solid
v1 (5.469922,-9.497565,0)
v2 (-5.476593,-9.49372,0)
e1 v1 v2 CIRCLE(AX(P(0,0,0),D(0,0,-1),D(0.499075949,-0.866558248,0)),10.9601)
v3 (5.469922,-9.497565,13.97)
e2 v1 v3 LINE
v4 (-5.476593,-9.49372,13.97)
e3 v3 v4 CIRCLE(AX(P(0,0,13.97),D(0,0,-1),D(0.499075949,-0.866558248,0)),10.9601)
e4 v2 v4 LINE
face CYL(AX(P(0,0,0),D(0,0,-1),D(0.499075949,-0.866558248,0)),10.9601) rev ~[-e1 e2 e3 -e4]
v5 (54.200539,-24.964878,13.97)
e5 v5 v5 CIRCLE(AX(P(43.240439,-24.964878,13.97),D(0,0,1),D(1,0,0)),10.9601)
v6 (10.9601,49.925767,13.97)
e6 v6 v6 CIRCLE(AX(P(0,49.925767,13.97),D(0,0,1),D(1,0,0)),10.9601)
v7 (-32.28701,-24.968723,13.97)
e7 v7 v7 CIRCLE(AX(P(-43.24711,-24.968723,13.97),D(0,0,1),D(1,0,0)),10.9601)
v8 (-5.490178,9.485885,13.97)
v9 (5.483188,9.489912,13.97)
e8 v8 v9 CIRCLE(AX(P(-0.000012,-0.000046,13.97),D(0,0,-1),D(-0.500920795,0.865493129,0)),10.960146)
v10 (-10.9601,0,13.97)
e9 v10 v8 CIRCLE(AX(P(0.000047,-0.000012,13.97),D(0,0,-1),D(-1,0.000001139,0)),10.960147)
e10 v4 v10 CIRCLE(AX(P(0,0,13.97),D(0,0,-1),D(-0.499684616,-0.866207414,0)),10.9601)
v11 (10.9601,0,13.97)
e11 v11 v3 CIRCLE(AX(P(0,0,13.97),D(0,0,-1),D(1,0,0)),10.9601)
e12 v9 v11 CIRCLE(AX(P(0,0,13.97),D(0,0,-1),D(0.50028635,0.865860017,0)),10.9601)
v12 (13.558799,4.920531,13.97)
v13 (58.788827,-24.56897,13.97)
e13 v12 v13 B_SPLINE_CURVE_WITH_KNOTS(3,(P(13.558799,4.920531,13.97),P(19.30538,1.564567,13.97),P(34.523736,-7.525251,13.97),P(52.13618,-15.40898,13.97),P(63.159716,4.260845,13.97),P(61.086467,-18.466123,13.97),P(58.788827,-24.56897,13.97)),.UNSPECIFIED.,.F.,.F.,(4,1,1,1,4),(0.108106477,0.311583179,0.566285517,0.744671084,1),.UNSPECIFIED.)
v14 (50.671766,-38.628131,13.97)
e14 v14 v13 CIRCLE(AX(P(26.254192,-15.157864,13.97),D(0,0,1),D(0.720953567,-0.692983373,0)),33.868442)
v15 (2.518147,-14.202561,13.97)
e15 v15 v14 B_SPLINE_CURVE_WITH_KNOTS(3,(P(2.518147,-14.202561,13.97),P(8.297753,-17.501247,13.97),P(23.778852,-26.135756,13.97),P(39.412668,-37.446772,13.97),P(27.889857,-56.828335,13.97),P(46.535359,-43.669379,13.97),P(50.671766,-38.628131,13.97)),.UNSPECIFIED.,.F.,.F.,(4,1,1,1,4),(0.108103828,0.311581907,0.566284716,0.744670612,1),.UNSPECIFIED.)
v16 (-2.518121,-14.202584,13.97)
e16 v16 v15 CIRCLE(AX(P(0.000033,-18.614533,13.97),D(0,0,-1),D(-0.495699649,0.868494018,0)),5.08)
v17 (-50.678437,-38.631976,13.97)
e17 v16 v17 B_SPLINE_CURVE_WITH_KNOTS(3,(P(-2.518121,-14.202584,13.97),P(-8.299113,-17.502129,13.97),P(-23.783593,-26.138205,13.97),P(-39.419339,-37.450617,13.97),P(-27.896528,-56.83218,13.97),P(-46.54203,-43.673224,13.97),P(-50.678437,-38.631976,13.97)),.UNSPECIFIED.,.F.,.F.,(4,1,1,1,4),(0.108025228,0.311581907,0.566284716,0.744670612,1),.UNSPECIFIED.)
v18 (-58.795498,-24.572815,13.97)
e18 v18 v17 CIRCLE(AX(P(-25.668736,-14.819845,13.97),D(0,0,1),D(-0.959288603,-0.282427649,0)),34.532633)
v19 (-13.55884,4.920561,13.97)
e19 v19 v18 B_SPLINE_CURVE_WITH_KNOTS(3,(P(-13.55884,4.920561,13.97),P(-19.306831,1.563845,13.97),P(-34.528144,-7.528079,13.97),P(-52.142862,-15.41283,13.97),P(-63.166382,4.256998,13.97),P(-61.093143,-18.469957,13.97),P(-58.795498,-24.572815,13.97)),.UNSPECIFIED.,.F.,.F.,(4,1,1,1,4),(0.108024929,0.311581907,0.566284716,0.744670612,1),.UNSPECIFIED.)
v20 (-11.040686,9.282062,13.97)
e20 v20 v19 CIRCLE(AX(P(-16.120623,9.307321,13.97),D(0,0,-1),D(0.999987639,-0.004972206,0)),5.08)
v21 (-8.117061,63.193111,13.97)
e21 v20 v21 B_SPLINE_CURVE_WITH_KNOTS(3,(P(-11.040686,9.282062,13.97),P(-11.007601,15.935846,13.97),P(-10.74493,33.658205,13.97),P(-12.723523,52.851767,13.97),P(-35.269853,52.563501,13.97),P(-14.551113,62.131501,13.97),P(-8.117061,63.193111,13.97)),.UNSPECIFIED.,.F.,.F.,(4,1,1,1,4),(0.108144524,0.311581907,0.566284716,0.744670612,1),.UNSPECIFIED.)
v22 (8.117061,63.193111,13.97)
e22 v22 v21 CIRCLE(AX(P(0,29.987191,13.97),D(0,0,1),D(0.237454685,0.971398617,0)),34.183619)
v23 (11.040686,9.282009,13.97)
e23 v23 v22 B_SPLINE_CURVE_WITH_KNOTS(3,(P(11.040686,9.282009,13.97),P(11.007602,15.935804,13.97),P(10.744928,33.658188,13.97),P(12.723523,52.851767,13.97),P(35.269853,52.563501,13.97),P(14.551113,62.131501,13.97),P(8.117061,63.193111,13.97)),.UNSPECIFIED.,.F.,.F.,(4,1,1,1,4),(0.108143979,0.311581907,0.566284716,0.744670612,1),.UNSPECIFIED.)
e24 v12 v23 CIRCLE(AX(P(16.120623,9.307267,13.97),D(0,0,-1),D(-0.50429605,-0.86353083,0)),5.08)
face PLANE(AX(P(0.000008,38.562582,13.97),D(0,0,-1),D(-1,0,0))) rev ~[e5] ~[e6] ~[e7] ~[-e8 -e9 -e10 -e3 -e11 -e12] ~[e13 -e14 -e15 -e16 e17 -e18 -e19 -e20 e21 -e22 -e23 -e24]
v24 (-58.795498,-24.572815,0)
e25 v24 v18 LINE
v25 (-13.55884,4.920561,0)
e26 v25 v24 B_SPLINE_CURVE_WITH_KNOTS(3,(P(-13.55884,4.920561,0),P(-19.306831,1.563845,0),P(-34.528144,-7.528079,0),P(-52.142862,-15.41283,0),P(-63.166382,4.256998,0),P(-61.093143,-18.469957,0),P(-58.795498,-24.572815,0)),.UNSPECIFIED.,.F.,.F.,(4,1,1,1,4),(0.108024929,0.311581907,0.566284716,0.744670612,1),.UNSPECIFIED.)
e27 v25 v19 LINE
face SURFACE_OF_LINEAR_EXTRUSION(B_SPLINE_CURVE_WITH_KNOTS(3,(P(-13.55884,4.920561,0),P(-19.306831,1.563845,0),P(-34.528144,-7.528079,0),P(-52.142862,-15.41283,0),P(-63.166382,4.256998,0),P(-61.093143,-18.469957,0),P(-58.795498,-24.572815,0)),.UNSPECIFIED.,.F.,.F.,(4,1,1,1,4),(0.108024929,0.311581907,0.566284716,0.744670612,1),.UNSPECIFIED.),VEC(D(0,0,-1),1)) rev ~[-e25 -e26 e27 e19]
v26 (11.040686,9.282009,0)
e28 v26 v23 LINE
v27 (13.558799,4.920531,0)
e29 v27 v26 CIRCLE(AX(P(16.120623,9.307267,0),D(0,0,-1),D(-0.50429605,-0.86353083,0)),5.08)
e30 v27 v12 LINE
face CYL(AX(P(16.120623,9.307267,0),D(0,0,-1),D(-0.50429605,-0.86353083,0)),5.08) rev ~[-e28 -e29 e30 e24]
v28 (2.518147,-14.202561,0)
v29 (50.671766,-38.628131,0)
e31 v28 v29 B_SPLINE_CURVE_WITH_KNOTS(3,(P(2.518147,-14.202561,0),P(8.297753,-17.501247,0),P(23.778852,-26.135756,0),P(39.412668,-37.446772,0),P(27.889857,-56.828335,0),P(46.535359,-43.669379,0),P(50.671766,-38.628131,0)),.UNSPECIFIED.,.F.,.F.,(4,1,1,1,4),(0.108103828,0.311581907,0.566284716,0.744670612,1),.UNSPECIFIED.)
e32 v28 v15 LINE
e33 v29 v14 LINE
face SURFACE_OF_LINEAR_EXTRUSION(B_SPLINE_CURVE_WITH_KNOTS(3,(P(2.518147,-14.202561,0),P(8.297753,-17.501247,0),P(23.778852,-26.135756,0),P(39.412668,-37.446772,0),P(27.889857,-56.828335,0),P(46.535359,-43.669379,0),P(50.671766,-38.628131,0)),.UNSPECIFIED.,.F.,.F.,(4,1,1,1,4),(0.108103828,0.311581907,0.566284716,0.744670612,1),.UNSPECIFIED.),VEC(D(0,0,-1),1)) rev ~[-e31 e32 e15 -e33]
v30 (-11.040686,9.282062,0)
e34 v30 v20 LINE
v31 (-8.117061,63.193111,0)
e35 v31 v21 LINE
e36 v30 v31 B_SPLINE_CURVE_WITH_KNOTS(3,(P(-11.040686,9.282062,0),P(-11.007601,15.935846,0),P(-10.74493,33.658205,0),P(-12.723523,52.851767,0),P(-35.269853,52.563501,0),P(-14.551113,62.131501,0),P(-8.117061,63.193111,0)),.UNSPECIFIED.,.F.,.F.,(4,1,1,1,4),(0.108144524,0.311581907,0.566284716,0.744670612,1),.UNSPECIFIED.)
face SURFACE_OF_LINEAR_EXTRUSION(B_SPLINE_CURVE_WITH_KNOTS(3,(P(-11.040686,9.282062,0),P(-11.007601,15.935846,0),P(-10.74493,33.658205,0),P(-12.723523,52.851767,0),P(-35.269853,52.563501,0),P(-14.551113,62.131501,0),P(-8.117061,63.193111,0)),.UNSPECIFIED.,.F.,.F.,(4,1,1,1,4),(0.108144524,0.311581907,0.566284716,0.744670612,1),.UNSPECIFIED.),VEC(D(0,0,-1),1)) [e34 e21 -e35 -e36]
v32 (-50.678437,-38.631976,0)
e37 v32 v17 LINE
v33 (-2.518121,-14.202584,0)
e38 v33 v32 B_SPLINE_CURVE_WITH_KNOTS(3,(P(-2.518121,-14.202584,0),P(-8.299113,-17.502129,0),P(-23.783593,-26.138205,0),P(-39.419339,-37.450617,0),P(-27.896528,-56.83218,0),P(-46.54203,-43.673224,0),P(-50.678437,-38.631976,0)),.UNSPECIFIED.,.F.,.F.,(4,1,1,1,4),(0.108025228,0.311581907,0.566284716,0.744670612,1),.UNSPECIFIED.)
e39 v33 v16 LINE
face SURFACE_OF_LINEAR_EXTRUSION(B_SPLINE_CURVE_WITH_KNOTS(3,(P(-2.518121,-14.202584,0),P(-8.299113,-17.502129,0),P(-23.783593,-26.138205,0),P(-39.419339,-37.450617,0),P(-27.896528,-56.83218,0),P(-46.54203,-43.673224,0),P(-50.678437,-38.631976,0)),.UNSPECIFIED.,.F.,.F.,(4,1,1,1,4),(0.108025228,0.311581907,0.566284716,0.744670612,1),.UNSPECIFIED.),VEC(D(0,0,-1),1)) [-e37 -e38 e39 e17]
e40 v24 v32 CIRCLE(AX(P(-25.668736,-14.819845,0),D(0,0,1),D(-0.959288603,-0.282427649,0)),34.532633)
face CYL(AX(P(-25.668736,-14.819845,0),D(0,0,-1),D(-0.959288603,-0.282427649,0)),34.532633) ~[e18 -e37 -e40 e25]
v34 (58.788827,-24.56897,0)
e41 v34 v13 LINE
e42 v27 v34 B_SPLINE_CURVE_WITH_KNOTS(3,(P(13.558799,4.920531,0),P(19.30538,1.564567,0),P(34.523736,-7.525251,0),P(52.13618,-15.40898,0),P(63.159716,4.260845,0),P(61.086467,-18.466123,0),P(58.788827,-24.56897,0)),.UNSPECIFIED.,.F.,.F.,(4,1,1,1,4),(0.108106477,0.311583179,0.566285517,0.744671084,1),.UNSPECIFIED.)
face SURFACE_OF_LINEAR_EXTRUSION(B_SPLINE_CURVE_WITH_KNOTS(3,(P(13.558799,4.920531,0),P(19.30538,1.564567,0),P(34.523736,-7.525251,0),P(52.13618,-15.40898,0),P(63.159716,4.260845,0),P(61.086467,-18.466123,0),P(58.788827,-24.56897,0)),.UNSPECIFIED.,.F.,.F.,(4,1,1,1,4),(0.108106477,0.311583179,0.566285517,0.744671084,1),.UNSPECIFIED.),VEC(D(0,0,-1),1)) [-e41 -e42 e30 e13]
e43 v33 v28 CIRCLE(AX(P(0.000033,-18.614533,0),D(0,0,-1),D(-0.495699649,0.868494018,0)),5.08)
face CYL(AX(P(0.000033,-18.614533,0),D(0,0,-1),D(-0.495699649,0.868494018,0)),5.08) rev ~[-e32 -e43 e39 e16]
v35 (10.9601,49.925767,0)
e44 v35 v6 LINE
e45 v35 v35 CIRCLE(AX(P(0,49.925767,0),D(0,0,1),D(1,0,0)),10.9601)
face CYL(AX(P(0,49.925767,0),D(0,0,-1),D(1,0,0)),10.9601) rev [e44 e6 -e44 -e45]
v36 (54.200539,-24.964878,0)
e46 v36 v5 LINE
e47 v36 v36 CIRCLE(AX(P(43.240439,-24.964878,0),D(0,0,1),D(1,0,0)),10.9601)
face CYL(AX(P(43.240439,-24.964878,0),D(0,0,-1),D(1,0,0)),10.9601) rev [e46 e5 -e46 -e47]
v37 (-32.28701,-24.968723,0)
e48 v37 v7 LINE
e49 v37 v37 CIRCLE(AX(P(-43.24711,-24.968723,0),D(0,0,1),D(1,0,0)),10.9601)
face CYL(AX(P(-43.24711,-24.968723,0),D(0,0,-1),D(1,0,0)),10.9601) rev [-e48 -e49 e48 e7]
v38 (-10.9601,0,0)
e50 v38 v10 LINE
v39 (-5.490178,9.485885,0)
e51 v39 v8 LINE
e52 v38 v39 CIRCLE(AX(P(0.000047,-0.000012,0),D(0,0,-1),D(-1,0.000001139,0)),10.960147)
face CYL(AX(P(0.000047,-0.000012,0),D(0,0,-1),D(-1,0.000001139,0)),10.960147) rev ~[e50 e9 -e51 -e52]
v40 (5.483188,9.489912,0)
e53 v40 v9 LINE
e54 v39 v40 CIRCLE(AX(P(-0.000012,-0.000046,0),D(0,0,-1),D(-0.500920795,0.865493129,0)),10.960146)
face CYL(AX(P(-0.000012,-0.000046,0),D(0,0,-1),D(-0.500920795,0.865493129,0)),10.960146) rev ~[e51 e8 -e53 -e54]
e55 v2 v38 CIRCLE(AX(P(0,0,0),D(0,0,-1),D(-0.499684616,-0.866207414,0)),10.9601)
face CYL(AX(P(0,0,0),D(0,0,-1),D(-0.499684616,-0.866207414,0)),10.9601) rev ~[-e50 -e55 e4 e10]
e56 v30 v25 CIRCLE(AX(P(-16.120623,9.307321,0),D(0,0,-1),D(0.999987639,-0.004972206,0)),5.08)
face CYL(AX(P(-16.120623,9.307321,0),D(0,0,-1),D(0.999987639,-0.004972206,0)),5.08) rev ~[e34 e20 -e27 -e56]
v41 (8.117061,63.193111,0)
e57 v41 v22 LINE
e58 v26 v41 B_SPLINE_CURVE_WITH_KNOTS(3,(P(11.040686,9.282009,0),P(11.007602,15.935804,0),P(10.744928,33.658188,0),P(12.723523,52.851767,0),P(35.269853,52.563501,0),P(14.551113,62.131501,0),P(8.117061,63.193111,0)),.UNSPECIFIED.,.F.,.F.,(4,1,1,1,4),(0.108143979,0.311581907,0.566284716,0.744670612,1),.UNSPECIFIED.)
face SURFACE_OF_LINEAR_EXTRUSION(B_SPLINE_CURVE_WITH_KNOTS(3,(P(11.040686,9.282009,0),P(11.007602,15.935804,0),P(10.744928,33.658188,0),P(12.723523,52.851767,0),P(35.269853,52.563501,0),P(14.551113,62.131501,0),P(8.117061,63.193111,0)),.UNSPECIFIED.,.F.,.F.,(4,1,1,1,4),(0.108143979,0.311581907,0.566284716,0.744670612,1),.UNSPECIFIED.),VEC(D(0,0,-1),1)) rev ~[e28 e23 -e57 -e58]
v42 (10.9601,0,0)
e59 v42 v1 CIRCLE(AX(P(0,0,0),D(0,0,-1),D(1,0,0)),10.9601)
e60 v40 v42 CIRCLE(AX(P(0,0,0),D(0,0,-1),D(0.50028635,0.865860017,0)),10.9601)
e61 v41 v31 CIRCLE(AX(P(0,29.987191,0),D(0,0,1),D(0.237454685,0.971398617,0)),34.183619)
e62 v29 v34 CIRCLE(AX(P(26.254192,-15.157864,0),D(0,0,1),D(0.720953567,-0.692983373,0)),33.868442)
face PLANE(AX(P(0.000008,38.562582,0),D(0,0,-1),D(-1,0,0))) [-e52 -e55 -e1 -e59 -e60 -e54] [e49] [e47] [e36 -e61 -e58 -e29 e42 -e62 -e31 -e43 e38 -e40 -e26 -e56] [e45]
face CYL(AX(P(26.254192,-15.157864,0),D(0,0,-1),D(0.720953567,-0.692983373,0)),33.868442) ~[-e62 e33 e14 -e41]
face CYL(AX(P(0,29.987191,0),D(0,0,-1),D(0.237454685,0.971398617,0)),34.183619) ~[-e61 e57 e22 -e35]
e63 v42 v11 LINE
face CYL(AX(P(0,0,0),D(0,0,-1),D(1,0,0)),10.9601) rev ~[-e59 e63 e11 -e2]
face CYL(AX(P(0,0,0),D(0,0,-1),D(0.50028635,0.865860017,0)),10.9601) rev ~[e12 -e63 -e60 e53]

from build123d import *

# Parameters (mm, degrees)
F0_R     = 10.9601
F1_DEPTH = 13.97


# Not quite as in the source:
# - ends of sketch curves that miss each other by under 0.0002 mm in the source are joined


with BuildPart() as f1:
    # F0 (on Top) → F1 (new body)
    with BuildSketch(Plane.XY):
        with BuildLine():
            add(Edge.make_bspline(
                [(-11.0406858774, 9.2820621436), (-11.0076014857, 15.9358459435), (-10.7449299367, 33.6582046386), (-12.7235225678, 52.8517669252), (-35.2698533951, 52.5635012401), (-14.5511130353, 62.1315011674), (-8.1170605379, 63.1931111653)],
                knots=[0.1081445238, 0.1081445238, 0.1081445238, 0.1081445238, 0.3115819068, 0.5662847157, 0.7446706117, 1, 1, 1, 1], degree=3))
            add(Edge.make_bspline(
                [(-11.0485298495, 6.3788758502), (-11.0487262833, 7.3148332558), (-11.0456445743, 8.2847913468), (-11.0406858774, 9.2820621436)],
                knots=[0.0776532775, 0.0776532775, 0.0776532775, 0.0776532775, 0.1081445238, 0.1081445238, 0.1081445238, 0.1081445238], degree=3))
            add(Edge.make_bspline(
                [(-5.490177696, 9.4858849998), (-7.1072740945, 8.6285327965), (-8.9879537059, 7.5678930589), (-11.0485298495, 6.3788758502)],
                knots=[0, 0, 0, 0, 0.077526237, 0.077526237, 0.077526237, 0.077526237], degree=3))
            ThreePointArc((-5.490177696, 9.4858849998), (-0.0040332803, 10.9600992579), (5.4831884226, 9.4899123669))
            add(Edge.make_bspline(
                [(5.4831884226, 9.4899123669), (7.1021143759, 8.6315901702), (8.9852286388, 7.5695155183), (11.0485570412, 6.378854666)],
                knots=[0, 0, 0, 0, 0.0776139489, 0.0776139489, 0.0776139489, 0.0776139489], degree=3))
            add(Edge.make_bspline(
                [(11.0485570412, 6.378854666), (11.0487264298, 7.3147693284), (11.0456448051, 8.2847324252), (11.0406861431, 9.2820087008)],
                knots=[0.0776525355, 0.0776525355, 0.0776525355, 0.0776525355, 0.1081439792, 0.1081439792, 0.1081439792, 0.1081439792], degree=3))
            add(Edge.make_bspline(
                [(11.0406861431, 9.2820087008), (11.0076021103, 15.9358038046), (10.7449282436, 33.658188215), (12.7235225678, 52.8517669252), (35.2698533951, 52.5635012401), (14.5511130353, 62.1315011674), (8.1170605379, 63.1931111653)],
                knots=[0.1081439792, 0.1081439792, 0.1081439792, 0.1081439792, 0.3115819068, 0.5662847157, 0.7446706117, 1, 1, 1, 1], degree=3))
            ThreePointArc((8.1170605379, 63.1931111653), (0, 64.1708099603), (-8.1170605379, 63.1931111653))
        make_face()
        with Locations((0, 49.9257668853)):
            Circle(F0_R, mode=Mode.SUBTRACT)
        with BuildLine():
            add(Edge.make_bspline(
                [(-11.0485298495, 6.3788758502), (-11.0487262833, 7.3148332558), (-11.0456445743, 8.2847913468), (-11.0406858774, 9.2820621436)],
                knots=[0.0776532775, 0.0776532775, 0.0776532775, 0.0776532775, 0.1081445238, 0.1081445238, 0.1081445238, 0.1081445238], degree=3))
            ThreePointArc((-11.0406858774, 9.2820621436), (-11.7212314541, 6.7672907696), (-13.5588398975, 4.9205605363))
            add(Edge.make_bspline(
                [(-11.0485298494, 6.3788758502), (-11.8591570463, 5.9111184756), (-12.6976254335, 5.423493116), (-13.5588398975, 4.9205605363)],
                knots=[0.077526237, 0.077526237, 0.077526237, 0.077526237, 0.1080249286, 0.1080249286, 0.1080249286, 0.1080249286], degree=3))
        make_face()
        with BuildLine():
            add(Edge.make_bspline(
                [(-5.490177696, 9.4858849998), (-7.1072740945, 8.6285327965), (-8.9879537059, 7.5678930589), (-11.0485298494, 6.3788758502)],
                knots=[0, 0, 0, 0, 0.077526237, 0.077526237, 0.077526237, 0.077526237], degree=3))
            add(Edge.make_bspline(
                [(-10.9601, 0), (-11.0262676612, 1.8321200044), (-11.0480295836, 3.9952356637), (-11.0485298494, 6.3788758502)],
                knots=[0, 0, 0, 0, 0.0776532775, 0.0776532775, 0.0776532775, 0.0776532775], degree=3))
            ThreePointArc((-10.9601, 0), (-9.4946463892, 5.4749869364), (-5.490177696, 9.4858849998))
        make_face()
        with BuildLine():
            add(Edge.make_bspline(
                [(-10.9601, 0), (-11.0262676612, 1.8321200044), (-11.0480295836, 3.9952356637), (-11.0485298495, 6.3788758502)],
                knots=[0, 0, 0, 0, 0.0776532775, 0.0776532775, 0.0776532775, 0.0776532775], degree=3))
            add(Edge.make_bspline(
                [(-11.0485298494, 6.3788758502), (-11.8591570463, 5.9111184756), (-12.6976254335, 5.423493116), (-13.5588398975, 4.9205605363)],
                knots=[0.077526237, 0.077526237, 0.077526237, 0.077526237, 0.1080249286, 0.1080249286, 0.1080249286, 0.1080249286], degree=3))
            add(Edge.make_bspline(
                [(-13.5588398975, 4.9205605363), (-19.3068312047, 1.5638448547), (-34.5281439644, -7.528078893), (-52.142861772, -15.4128297215), (-63.1663817793, 4.2569983796), (-61.0931425999, -18.46995707), (-58.7954975783, -24.572814981)],
                knots=[0.1080249286, 0.1080249286, 0.1080249286, 0.1080249286, 0.3115819068, 0.5662847157, 0.7446706117, 1, 1, 1, 1], degree=3))
            ThreePointArc((-58.7954975783, -24.572814981), (-55.5748737612, -32.0861611265), (-50.6784370404, -38.6319762408))
            add(Edge.make_bspline(
                [(-2.5181212243, -14.2025838003), (-8.299112665, -17.5021291831), (-23.7835931212, -26.1382048835), (-39.4193392042, -37.4506172602), (-27.8965283843, -56.8321796762), (-46.5420295646, -43.6732241539), (-50.6784370404, -38.6319762408)],
                knots=[0.1080252275, 0.1080252275, 0.1080252275, 0.1080252275, 0.3115819068, 0.5662847157, 0.7446706117, 1, 1, 1, 1], degree=3))
            add(Edge.make_bspline(
                [(-7.2729e-06, -12.7577373339), (-0.8104171528, -13.2258861395), (-1.6519542861, -13.7082123502), (-2.5181212243, -14.2025838003)],
                knots=[0.0775262953, 0.0775262953, 0.0775262953, 0.0775262953, 0.1080252275, 0.1080252275, 0.1080252275, 0.1080252275], degree=3))
            add(Edge.make_bspline(
                [(-5.4765933563, -9.4937198832), (-3.9238847553, -10.4665376582), (-2.0626684707, -11.5662545114), (-7.2729e-06, -12.7577373338)],
                knots=[0, 0, 0, 0, 0.0776097901, 0.0776097901, 0.0776097901, 0.0776097901], degree=3))
            ThreePointArc((-5.4765933563, -9.4937198832), (-9.4907271285, -5.4817780494), (-10.9601, 0))
        make_face()
        with Locations((-43.2471101221, -24.9687234709)):
            Circle(F0_R, mode=Mode.SUBTRACT)
        with BuildLine():
            ThreePointArc((13.5587994149, 4.920530574), (11.7212198447, 6.7672575808), (11.0406861431, 9.2820087008))
            add(Edge.make_bspline(
                [(11.0485298351, 6.3788075199), (11.0487264298, 7.3147693284), (11.0456448051, 8.2847324252), (11.0406861431, 9.2820087008)],
                knots=[0.0776525355, 0.0776525355, 0.0776525355, 0.0776525355, 0.1081439792, 0.1081439792, 0.1081439792, 0.1081439792], degree=3))
            Line((11.0485298351, 6.3788075199), (11.052011444, 6.3768612511))
            add(Edge.make_bspline(
                [(11.052011444, 6.3768612511), (11.8615676965, 5.9096893035), (12.698853869, 5.4227328428), (13.5587994149, 4.920530574)],
                knots=[0.0776572602, 0.0776572602, 0.0776572602, 0.0776572602, 0.1081064771, 0.1081064771, 0.1081064771, 0.1081064771], degree=3))
        make_face()
        with BuildLine():
            ThreePointArc((5.469922304, -9.4975650563), (-0.0038499446, -10.9600993238), (-5.4765933563, -9.4937198832))
            add(Edge.make_bspline(
                [(-5.4765933563, -9.4937198832), (-3.9238847553, -10.4665376582), (-2.0626684707, -11.5662545114), (-7.2729e-06, -12.7577373338)],
                knots=[0, 0, 0, 0, 0.0776097901, 0.0776097901, 0.0776097901, 0.0776097901], degree=3))
            add(Edge.make_bspline(
                [(5.469922304, -9.4975650563), (3.9188841505, -10.4693362468), (2.0600017585, -11.567733619), (-7.2729e-06, -12.7577373339)],
                knots=[0, 0, 0, 0, 0.0775262953, 0.0775262953, 0.0775262953, 0.0775262953], degree=3))
        make_face()
        with BuildLine():
            add(Edge.make_bspline(
                [(5.4831884226, 9.4899123669), (7.1021143759, 8.6315901702), (8.9852286388, 7.5695155183), (11.0485570412, 6.378854666)],
                knots=[0, 0, 0, 0, 0.0776139489, 0.0776139489, 0.0776139489, 0.0776139489], degree=3))
            ThreePointArc((5.4831884226, 9.4899123669), (9.4926309694, 5.478480564), (10.9601, 0))
            add(Edge.make_bspline(
                [(10.9601, 0), (11.026267029, 1.8321024976), (11.0480291677, 3.9951943245), (11.0485570412, 6.378854666)],
                knots=[0, 0, 0, 0, 0.0776525355, 0.0776525355, 0.0776525355, 0.0776525355], degree=3))
        make_face()
        with BuildLine():
            Line((11.052011444, 6.3768612511), (11.0485298351, 6.3788075199))
            add(Edge.make_bspline(
                [(10.9601, 0), (11.026267029, 1.8321024976), (11.0480291677, 3.9951943245), (11.0485298351, 6.3788075199)],
                knots=[0, 0, 0, 0, 0.0776525355, 0.0776525355, 0.0776525355, 0.0776525355], degree=3))
            ThreePointArc((10.9601, 0), (9.4888009636, -5.4851115105), (5.469922304, -9.4975650563))
            add(Edge.make_bspline(
                [(5.469922304, -9.4975650563), (3.9188841505, -10.4693362468), (2.0600017585, -11.567733619), (-7.2729e-06, -12.7577373339)],
                knots=[0, 0, 0, 0, 0.0775262953, 0.0775262953, 0.0775262953, 0.0775262953], degree=3))
            add(Edge.make_bspline(
                [(-7.2729e-06, -12.7577373338), (0.8104429093, -13.2258886093), (1.6519925735, -13.7082069048), (2.5181473988, -14.2025610809)],
                knots=[0.0776097901, 0.0776097901, 0.0776097901, 0.0776097901, 0.1081038279, 0.1081038279, 0.1081038279, 0.1081038279], degree=3))
            add(Edge.make_bspline(
                [(2.5181473988, -14.2025610809), (8.2977532688, -17.5012465062), (23.7788524629, -26.1357563444), (39.4126681519, -37.4467720871), (27.889857332, -56.8283345031), (46.5353585123, -43.6693789807), (50.6717659881, -38.6281310677)],
                knots=[0.1081038279, 0.1081038279, 0.1081038279, 0.1081038279, 0.3115819068, 0.5662847157, 0.7446706117, 1, 1, 1, 1], degree=3))
            ThreePointArc((50.6717659881, -38.6281310677), (55.5851230712, -32.092084929), (58.788826526, -24.5689698079))
            add(Edge.make_bspline(
                [(13.5587994149, 4.920530574), (19.3053801646, 1.5645670436), (34.5237357223, -7.5252510333), (52.1361800766, -15.4089802612), (63.1597156942, 4.26084514), (61.0864673005, -18.4661231778), (58.788826526, -24.5689698079)],
                knots=[0.1081064771, 0.1081064771, 0.1081064771, 0.1081064771, 0.3115831793, 0.5662855174, 0.7446710837, 1, 1, 1, 1], degree=3))
            add(Edge.make_bspline(
                [(11.052011444, 6.3768612511), (11.8615676965, 5.9096893035), (12.698853869, 5.4227328428), (13.5587994149, 4.920530574)],
                knots=[0.0776572602, 0.0776572602, 0.0776572602, 0.0776572602, 0.1081064771, 0.1081064771, 0.1081064771, 0.1081064771], degree=3))
        make_face()
        with Locations((43.2404390698, -24.9648782978)):
            Circle(F0_R, mode=Mode.SUBTRACT)
        with BuildLine():
            add(Edge.make_bspline(
                [(-7.2729e-06, -12.7577373338), (0.8104429093, -13.2258886093), (1.6519925735, -13.7082069048), (2.5181473988, -14.2025610809)],
                knots=[0.0776097901, 0.0776097901, 0.0776097901, 0.0776097901, 0.1081038279, 0.1081038279, 0.1081038279, 0.1081038279], degree=3))
            add(Edge.make_bspline(
                [(-7.2729e-06, -12.7577373339), (-0.8104171528, -13.2258861395), (-1.6519542861, -13.7082123502), (-2.5181212243, -14.2025838003)],
                knots=[0.0775262953, 0.0775262953, 0.0775262953, 0.0775262953, 0.1080252275, 0.1080252275, 0.1080252275, 0.1080252275], degree=3))
            ThreePointArc((-2.5181212243, -14.2025838003), (1.00736e-05, -13.5345334093), (2.5181473988, -14.2025610809))
        make_face()
    extrude(amount=F1_DEPTH)


solid = f1.part
